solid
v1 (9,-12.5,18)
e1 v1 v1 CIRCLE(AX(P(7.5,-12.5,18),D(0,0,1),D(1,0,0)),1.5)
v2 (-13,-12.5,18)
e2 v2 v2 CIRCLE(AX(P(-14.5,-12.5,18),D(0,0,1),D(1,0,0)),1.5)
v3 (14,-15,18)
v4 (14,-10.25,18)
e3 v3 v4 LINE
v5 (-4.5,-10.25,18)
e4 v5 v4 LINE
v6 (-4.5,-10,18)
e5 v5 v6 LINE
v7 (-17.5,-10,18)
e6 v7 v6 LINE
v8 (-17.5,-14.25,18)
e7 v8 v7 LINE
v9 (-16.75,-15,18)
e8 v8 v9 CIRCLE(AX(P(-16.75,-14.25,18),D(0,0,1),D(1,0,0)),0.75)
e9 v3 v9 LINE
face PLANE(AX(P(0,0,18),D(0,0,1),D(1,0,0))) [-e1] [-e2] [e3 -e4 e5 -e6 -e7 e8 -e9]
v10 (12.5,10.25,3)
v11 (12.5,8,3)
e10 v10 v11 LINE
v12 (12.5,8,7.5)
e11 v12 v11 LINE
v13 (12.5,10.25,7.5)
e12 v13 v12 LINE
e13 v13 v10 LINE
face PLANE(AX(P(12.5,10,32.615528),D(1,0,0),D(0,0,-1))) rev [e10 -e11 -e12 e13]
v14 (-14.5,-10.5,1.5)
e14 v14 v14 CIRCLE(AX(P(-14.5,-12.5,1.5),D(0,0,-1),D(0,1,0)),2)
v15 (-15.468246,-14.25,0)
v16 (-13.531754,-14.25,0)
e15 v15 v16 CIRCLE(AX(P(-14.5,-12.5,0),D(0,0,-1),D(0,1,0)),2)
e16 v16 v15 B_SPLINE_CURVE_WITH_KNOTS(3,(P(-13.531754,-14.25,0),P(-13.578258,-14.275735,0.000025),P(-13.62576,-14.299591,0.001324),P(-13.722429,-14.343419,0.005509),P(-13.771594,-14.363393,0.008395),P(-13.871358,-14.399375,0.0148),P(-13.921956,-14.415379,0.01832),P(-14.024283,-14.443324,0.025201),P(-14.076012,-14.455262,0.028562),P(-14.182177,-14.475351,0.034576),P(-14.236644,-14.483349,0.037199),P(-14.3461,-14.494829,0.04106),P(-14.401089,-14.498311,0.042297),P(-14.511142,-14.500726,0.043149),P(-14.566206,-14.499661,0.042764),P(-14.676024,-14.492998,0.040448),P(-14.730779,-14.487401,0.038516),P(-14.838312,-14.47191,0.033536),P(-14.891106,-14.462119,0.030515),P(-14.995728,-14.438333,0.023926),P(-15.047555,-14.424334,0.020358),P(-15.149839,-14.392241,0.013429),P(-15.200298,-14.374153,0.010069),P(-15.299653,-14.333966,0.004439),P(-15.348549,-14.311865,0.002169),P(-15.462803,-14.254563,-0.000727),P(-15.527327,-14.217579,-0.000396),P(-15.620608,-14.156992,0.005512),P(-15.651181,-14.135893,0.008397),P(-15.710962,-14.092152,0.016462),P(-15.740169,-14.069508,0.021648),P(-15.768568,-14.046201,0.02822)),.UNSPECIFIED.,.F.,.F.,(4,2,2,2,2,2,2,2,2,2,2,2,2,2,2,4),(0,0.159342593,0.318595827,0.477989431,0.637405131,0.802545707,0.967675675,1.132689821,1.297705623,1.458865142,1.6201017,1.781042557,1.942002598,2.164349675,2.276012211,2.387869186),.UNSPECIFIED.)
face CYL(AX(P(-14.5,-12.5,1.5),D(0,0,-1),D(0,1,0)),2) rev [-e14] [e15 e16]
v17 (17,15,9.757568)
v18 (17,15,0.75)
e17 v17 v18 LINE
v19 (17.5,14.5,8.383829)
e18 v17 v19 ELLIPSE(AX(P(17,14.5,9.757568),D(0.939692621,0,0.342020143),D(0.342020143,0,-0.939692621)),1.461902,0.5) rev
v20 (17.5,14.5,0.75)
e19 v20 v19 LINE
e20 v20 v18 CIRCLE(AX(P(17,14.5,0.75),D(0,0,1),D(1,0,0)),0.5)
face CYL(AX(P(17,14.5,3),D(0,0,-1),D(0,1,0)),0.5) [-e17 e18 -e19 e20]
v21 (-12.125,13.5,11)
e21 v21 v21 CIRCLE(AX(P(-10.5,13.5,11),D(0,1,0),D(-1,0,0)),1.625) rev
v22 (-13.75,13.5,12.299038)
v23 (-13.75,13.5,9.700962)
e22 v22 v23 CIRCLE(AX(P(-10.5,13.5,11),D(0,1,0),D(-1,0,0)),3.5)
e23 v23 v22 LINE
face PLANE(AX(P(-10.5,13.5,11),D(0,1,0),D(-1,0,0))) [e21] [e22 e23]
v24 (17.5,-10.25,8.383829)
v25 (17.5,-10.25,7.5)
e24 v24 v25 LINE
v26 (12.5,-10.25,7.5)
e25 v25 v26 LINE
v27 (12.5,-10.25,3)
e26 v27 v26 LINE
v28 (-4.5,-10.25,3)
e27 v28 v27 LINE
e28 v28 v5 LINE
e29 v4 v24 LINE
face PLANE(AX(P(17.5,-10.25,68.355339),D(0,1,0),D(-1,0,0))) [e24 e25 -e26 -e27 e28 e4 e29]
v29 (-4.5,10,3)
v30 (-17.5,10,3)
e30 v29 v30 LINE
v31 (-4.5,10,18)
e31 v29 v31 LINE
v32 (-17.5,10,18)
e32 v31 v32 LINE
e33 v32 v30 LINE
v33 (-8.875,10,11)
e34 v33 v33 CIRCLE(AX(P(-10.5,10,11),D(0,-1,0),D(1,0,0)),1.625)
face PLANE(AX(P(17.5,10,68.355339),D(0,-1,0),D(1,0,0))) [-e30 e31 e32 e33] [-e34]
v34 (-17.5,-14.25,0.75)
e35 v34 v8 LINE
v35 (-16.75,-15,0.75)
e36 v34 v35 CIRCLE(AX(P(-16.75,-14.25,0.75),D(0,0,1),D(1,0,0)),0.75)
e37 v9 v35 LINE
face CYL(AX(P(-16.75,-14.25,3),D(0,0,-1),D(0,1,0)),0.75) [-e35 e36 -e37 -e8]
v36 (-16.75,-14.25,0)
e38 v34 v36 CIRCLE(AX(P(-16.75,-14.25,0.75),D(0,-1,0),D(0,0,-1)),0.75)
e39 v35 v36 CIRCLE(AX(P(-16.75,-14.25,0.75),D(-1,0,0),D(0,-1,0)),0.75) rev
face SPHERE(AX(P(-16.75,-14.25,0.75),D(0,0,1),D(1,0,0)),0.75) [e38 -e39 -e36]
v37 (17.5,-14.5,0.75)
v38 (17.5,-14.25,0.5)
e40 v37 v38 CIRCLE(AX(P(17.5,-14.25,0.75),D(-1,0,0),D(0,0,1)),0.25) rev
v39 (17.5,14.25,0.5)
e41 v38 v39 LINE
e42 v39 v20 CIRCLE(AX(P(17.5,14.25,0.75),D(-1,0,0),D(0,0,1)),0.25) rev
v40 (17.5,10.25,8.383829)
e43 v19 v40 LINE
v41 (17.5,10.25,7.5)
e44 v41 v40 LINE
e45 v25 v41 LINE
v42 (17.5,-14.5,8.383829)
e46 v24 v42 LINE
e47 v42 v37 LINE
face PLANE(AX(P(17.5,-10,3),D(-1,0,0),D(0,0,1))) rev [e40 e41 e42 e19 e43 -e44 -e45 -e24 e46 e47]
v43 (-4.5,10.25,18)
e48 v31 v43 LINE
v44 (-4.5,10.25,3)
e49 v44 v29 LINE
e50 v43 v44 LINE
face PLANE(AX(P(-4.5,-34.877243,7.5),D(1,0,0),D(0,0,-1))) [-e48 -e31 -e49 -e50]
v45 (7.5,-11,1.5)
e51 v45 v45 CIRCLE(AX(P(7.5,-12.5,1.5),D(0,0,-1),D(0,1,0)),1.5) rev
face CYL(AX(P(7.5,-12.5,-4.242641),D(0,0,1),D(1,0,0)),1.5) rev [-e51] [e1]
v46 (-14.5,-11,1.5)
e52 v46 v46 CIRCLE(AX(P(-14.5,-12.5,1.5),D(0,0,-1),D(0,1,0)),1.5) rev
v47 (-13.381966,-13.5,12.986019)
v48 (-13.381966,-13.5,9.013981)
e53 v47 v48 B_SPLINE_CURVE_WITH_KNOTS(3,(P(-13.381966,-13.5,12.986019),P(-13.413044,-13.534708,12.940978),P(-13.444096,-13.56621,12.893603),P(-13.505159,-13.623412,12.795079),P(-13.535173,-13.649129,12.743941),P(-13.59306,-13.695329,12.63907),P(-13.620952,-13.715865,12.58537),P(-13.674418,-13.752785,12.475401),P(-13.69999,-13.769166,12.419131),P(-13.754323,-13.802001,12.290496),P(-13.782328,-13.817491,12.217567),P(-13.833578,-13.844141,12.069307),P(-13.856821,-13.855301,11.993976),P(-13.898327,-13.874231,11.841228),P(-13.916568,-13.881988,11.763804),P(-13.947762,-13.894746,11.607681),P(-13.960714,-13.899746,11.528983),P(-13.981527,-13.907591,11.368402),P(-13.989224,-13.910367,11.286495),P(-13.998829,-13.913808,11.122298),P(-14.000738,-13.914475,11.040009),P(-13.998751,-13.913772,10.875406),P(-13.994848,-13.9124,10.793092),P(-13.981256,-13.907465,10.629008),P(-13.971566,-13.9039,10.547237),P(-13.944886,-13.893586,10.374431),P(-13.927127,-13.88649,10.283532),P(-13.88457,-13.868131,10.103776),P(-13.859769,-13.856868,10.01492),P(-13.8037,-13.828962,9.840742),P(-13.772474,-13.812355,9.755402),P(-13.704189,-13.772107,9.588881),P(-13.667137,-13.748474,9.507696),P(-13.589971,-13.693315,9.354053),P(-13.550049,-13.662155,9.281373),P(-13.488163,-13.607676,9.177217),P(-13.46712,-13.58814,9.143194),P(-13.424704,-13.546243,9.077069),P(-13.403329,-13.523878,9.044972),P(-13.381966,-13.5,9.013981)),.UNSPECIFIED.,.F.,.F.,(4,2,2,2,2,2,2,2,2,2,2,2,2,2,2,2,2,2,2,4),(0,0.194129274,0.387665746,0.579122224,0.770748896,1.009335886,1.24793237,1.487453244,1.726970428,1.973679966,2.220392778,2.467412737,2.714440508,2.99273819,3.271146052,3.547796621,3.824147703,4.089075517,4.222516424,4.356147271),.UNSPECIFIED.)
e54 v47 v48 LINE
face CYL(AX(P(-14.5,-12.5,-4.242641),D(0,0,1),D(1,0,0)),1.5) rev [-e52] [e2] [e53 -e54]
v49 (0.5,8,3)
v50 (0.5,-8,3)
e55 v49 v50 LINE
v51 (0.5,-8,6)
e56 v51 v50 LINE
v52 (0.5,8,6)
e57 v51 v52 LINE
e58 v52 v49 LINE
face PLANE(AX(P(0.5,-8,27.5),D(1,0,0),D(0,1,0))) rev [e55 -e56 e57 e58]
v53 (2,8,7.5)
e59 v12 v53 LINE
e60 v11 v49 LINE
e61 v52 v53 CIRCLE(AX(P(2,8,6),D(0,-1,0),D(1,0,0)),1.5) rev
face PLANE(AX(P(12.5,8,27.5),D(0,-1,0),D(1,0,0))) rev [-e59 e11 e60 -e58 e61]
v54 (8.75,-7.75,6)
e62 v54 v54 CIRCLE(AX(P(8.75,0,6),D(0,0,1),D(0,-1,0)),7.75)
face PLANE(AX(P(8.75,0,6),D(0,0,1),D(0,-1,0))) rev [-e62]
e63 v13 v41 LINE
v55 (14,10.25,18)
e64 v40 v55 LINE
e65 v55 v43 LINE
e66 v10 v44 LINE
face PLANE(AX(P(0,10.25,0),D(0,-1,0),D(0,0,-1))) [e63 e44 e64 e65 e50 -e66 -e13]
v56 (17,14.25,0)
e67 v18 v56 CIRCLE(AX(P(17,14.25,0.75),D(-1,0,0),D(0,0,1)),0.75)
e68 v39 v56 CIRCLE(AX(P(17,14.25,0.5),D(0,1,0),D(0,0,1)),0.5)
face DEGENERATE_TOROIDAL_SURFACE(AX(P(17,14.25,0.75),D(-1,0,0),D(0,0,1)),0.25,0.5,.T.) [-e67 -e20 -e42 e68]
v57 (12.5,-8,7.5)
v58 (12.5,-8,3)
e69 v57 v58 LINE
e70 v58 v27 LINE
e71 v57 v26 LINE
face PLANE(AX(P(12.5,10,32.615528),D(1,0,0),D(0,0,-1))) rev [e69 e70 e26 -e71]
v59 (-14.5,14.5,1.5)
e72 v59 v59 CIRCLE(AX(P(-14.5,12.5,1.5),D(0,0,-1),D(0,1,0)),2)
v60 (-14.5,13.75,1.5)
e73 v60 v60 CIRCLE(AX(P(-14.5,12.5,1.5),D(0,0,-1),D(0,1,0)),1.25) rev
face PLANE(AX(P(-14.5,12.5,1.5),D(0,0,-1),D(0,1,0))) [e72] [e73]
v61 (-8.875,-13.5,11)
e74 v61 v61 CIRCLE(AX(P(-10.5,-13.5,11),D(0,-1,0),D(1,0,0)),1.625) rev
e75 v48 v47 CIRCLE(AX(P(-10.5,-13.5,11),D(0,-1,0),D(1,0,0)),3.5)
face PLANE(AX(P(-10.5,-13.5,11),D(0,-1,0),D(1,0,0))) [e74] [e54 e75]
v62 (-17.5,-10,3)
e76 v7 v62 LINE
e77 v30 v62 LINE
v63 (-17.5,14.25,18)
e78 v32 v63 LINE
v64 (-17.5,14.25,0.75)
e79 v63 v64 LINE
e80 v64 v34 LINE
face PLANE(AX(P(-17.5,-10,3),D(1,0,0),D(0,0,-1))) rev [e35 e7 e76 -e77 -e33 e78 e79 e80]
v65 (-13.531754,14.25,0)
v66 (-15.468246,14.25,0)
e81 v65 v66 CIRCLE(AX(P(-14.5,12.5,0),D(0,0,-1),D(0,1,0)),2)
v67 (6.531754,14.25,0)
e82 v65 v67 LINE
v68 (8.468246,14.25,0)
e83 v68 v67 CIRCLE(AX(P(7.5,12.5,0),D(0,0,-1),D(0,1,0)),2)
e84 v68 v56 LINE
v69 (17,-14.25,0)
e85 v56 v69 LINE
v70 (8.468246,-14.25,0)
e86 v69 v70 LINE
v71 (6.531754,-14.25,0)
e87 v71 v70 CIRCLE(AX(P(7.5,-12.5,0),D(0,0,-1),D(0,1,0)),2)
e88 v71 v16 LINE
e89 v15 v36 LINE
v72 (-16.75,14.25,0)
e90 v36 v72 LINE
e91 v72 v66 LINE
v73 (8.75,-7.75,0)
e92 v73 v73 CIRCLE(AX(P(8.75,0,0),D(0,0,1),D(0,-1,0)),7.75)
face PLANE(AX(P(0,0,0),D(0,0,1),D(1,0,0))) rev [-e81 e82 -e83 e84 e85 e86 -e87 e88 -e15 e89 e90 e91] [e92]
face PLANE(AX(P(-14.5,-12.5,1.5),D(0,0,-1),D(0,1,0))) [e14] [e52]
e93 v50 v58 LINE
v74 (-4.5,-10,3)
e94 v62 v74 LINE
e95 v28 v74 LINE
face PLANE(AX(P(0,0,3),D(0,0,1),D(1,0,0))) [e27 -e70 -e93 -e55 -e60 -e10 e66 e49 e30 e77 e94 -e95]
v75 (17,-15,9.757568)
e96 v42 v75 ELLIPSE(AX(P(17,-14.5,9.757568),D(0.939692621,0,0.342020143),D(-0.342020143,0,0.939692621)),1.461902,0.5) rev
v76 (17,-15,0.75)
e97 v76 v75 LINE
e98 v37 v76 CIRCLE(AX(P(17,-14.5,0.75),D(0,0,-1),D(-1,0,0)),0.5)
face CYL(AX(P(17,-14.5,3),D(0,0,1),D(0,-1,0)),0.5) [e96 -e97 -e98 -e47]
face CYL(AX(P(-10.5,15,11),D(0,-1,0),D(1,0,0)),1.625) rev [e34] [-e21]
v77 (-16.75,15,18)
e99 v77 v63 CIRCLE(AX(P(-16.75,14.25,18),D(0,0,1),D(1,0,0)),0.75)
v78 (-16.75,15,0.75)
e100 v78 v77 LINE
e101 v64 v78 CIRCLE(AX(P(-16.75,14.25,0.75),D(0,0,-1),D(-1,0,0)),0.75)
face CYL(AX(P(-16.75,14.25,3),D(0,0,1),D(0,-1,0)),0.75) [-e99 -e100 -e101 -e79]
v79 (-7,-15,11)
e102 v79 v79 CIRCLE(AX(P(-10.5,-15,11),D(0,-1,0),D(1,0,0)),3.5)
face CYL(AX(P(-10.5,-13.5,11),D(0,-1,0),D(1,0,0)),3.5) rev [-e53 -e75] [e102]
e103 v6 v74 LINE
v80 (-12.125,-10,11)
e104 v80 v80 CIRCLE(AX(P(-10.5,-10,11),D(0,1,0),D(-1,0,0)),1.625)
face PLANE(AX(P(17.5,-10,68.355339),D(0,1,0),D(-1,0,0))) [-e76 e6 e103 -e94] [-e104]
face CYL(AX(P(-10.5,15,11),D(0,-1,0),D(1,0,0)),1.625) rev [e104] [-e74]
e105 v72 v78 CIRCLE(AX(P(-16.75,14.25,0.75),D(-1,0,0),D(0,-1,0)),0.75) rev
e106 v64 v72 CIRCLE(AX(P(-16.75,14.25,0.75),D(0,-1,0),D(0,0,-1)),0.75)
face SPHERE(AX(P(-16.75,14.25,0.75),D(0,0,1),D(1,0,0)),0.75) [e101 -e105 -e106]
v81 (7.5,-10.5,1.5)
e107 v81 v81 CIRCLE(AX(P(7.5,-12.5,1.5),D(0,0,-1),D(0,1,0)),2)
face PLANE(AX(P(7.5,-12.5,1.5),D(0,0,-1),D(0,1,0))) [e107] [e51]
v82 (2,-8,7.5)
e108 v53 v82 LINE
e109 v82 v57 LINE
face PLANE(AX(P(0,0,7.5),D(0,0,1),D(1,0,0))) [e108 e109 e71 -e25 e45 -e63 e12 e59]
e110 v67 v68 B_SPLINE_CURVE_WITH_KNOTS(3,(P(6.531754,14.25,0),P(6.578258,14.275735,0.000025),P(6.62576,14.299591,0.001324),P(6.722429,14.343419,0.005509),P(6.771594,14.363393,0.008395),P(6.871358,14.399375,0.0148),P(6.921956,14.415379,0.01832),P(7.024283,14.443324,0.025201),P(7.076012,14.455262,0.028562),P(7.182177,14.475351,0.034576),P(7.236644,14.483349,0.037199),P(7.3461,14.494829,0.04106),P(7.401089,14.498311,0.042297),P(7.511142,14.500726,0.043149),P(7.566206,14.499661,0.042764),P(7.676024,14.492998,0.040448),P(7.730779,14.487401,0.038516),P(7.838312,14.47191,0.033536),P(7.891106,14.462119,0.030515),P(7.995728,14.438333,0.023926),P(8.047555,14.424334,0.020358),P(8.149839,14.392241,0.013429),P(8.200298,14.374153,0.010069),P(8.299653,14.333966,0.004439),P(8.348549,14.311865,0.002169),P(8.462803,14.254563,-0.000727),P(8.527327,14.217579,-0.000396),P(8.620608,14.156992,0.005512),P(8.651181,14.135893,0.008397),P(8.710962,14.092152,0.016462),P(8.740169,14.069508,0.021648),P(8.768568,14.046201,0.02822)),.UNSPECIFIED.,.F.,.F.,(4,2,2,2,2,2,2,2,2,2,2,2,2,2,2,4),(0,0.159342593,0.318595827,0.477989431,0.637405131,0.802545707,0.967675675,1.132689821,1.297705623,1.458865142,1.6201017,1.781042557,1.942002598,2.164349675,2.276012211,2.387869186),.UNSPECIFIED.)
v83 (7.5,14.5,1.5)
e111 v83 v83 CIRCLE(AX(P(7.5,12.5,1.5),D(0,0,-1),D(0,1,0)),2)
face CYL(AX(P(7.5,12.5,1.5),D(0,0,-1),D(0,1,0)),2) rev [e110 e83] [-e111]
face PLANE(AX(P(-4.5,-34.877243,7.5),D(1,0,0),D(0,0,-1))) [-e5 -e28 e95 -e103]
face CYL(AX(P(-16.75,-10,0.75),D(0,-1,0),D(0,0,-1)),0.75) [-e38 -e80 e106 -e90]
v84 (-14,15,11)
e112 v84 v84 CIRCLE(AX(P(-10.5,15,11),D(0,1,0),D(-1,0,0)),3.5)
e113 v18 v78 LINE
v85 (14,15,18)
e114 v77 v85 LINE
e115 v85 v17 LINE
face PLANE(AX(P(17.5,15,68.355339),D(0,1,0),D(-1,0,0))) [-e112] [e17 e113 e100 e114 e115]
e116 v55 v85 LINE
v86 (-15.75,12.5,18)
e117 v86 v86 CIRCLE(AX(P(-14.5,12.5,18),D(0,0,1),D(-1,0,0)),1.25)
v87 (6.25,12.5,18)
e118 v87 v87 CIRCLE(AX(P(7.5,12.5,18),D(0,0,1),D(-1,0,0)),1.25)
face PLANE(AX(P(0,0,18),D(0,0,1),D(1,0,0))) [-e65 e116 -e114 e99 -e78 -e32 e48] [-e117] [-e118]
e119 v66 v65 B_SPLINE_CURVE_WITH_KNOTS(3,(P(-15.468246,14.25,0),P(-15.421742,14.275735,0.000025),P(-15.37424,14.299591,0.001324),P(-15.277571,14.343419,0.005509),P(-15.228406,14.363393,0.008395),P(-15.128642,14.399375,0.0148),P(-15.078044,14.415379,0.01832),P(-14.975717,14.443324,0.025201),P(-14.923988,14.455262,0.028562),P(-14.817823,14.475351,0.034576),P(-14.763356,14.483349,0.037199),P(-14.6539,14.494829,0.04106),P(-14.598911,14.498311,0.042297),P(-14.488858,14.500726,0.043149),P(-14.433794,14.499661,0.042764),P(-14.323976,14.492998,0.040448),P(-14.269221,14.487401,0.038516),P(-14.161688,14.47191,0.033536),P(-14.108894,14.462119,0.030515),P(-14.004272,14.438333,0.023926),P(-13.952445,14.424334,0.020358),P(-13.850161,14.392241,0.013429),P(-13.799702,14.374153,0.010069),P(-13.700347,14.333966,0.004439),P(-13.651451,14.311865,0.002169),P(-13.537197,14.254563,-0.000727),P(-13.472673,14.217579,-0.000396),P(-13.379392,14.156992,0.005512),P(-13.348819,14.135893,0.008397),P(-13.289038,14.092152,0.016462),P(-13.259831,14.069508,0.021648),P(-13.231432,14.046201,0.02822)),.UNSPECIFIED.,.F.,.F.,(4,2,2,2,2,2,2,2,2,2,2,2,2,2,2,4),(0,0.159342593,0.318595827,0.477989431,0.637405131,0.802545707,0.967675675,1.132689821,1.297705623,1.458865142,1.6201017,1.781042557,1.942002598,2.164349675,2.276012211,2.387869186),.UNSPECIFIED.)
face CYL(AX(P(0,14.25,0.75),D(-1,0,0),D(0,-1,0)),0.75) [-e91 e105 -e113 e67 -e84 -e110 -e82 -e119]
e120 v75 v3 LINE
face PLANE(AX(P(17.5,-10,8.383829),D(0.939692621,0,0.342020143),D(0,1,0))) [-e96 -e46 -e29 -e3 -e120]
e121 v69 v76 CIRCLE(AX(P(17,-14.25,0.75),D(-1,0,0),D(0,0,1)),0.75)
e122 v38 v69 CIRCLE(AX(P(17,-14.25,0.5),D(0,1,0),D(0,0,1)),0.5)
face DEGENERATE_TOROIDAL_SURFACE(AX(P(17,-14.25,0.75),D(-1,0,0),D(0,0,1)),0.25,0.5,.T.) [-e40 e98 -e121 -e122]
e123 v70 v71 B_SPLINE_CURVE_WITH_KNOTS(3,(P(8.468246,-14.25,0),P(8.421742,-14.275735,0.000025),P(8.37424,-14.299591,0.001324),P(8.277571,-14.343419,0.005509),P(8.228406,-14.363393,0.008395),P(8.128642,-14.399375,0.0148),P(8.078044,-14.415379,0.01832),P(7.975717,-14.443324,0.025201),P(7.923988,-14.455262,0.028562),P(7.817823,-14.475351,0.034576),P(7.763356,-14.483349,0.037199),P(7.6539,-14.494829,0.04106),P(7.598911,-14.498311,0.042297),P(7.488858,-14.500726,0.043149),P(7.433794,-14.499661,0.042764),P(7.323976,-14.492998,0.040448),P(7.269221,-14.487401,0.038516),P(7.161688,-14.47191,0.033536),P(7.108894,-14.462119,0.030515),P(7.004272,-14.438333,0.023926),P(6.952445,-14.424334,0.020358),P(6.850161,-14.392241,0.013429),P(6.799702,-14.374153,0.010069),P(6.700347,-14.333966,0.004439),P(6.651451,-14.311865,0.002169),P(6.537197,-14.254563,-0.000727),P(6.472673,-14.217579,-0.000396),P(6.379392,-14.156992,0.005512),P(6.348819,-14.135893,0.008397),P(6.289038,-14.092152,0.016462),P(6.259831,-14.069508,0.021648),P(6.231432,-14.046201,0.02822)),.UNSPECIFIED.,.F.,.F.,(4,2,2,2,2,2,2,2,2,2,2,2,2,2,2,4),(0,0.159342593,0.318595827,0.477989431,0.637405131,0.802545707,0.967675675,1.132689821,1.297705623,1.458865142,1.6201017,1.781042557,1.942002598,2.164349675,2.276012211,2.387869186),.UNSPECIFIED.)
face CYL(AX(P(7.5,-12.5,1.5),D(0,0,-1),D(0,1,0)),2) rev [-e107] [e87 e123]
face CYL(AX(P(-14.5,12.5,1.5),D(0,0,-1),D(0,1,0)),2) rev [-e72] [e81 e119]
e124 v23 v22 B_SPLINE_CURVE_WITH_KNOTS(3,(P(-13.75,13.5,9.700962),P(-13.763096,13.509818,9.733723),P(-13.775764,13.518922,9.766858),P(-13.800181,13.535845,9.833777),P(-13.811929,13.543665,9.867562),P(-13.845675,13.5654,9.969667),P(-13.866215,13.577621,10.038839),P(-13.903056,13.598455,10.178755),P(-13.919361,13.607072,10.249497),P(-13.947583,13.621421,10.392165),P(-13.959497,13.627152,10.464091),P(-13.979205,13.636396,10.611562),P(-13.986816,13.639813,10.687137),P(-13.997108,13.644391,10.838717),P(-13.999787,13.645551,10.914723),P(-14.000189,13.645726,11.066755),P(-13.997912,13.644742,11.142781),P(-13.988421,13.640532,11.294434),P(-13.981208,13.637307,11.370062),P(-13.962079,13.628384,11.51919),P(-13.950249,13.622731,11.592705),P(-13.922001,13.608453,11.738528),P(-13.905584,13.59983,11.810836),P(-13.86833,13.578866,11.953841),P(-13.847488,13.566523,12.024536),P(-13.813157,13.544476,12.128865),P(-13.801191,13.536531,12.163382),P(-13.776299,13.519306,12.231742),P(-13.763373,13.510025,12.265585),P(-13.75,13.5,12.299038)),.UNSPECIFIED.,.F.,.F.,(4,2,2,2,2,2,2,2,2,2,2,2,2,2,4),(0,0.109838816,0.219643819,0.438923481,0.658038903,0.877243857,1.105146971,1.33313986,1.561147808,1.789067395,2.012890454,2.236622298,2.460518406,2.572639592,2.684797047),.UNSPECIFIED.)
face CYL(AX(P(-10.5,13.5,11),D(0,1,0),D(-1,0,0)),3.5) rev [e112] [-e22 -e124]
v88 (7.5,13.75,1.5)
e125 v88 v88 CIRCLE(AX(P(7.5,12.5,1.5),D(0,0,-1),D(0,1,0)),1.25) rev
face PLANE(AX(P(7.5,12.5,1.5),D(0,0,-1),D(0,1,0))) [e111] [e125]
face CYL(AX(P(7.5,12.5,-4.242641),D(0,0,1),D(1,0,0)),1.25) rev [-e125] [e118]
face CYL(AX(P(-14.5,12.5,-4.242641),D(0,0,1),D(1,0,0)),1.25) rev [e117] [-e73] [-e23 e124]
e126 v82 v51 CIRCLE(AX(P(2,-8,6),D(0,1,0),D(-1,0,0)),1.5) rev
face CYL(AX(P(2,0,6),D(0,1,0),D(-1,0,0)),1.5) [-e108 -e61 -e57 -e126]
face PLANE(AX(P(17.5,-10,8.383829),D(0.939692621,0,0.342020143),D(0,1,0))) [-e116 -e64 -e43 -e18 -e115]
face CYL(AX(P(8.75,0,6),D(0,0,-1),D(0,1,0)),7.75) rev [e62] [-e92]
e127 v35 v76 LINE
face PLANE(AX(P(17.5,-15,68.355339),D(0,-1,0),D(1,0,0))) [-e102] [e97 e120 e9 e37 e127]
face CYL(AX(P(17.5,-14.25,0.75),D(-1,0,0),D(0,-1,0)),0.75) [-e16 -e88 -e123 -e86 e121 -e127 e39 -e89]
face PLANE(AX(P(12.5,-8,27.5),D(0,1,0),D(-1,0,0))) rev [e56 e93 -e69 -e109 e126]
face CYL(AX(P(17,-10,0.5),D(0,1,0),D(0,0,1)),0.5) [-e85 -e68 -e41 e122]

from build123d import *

# Parameters (mm, degrees)
SKETCH1_W              = 35
SKETCH1_H              = 20
BASE_PLATE_DEPTH       = 3
SKETCH2_W              = 35
SKETCH2_H              = 5
SIDE_WALLS_DEPTH       = 18
SKETCH4_R              = 1.5
SKETCH4_R_2            = 1.25
M2_SCREWS_DEPTH        = 18
SKETCH6_W              = 5
SKETCH6_H              = 20
RETURN_STOPPER_DEPTH   = 4.5
SKETCH9_W              = 12
SKETCH9_H              = 16
BOSS_EXTRUDE1_DEPTH    = 4.5
SKETCH7_R              = 7.75
MAGNET_POCKET_DEPTH    = 6
SKETCH8_R              = 2
M2_SCREW_HEAD_DEPTH    = 1.5
M3_ACHSLE_DEPTH        = 36.429507476
M3_ACHSLE_DEPTH_BACK   = 36.429507476
SKETCH5_R              = 1.625
SKETCH14_R             = 3.5
CUT_EXTRUDE1_DEPTH     = 1.5
CUT_EXTRUDE2_START     = -1.5
SKETCH15_R             = 3.5
CUT_EXTRUDE2_DEPTH     = 1.5
FILLET1_R              = 1.5
LEAVER_START           = -0.25
SKETCH11_W             = 22
SKETCH11_H             = 10.5
LEAVER_SPACE_DEPTH     = 20.5
SKETCH12_W             = 17
SKETCH12_H             = 4.5
MORE_SPACE_LEFT_DEPTH  = 0.25
SKETCH13_W             = 17
SKETCH13_H             = 4.5
MORE_SPACE_RIGHT_DEPTH = 0.25
FILLET2_R              = 0.75
FILLET3_R              = 0.75
FILLET4_R              = 0.75
FILLET5_R              = 0.5
CHAMFER1_SIZE          = 3.5
CHAMFER1_SIZE_2        = 9.616170968


with BuildPart() as part:
    # Sketch1 → Base Plate (new body)
    with BuildSketch(Plane.XY):
        Rectangle(SKETCH1_W, SKETCH1_H)
    extrude(amount=BASE_PLATE_DEPTH)

    # Sketch2 → Side Walls (add)
    with BuildSketch(Plane(origin=(0, 0, 0), x_dir=(1, 0, 0), z_dir=(0, 0, -1))):
        with Locations((0, -12.5)):
            Rectangle(SKETCH2_W, SKETCH2_H)
        with Locations((0, 12.5)):
            Rectangle(SKETCH2_W, SKETCH2_H)
    extrude(amount=-SIDE_WALLS_DEPTH)

    # Sketch4 → M2 Screws (cut)
    with BuildSketch(Plane.XY.offset(18)):
        with Locations((-14.5, -12.5)):
            Circle(SKETCH4_R)
        with Locations((7.5, -12.5)):
            Circle(SKETCH4_R)
        with Locations((7.5, 12.5)):
            Circle(SKETCH4_R_2)
        with Locations((-14.5, 12.5)):
            Circle(SKETCH4_R_2)
    extrude(amount=-M2_SCREWS_DEPTH, mode=Mode.SUBTRACT)

    # Sketch6 → Return Stopper (add)
    with BuildSketch(Plane.XY.offset(3)):
        with Locations((15, 0)):
            Rectangle(SKETCH6_W, SKETCH6_H)
    extrude(amount=RETURN_STOPPER_DEPTH)

    # Sketch9 → Boss-Extrude1 (add)
    with BuildSketch(Plane.XY.offset(3)):
        with Locations((6.5, 0)):
            Rectangle(SKETCH9_W, SKETCH9_H)
    extrude(amount=BOSS_EXTRUDE1_DEPTH)

    # Sketch7 → Magnet Pocket (cut)
    with BuildSketch(Plane(origin=(0, 0, 0), x_dir=(-1, 0, 0), z_dir=(0, 0, 1))):
        with Locations(Location((-8.75, 0, 0), (0, 0, 90))):
            Circle(SKETCH7_R)
    extrude(amount=MAGNET_POCKET_DEPTH, mode=Mode.SUBTRACT)

    # Sketch8 → M2 Screw Head (cut)
    with BuildSketch(Plane(origin=(0, 0, 0), x_dir=(1, 0, 0), z_dir=(0, 0, -1))):
        with Locations(Location((7.5, -12.5, 0), (0, 0, 270))):
            Circle(SKETCH8_R)
        with Locations(Location((-14.5, -12.5, 0), (0, 0, 270))):
            Circle(SKETCH8_R)
        with Locations(Location((7.5, 12.5, 0), (0, 0, 270))):
            Circle(SKETCH8_R)
        with Locations(Location((-14.5, 12.5, 0), (0, 0, 270))):
            Circle(SKETCH8_R)
    extrude(amount=-M2_SCREW_HEAD_DEPTH, mode=Mode.SUBTRACT)

    # Sketch5 → M3 Achsle (cut, two sides: drawn at the far end of the back side and taken through both)
    with BuildSketch(Plane.XZ.offset(-10).offset(-M3_ACHSLE_DEPTH_BACK)):
        with Locations((-10.5, 11)):
            Circle(SKETCH5_R)
    extrude(amount=M3_ACHSLE_DEPTH + M3_ACHSLE_DEPTH_BACK, mode=Mode.SUBTRACT)

    # Sketch14 → Cut-Extrude1 (cut)
    with BuildSketch(Plane(origin=(0, 15, 0), x_dir=(-1, 0, 0), z_dir=(0, 1, 0))):
        with Locations((10.5, 11)):
            Circle(SKETCH14_R)
    extrude(amount=-CUT_EXTRUDE1_DEPTH, mode=Mode.SUBTRACT)

    # Sketch15 → Cut-Extrude2 (cut)
    with BuildSketch(Plane.XZ.offset(15).offset(CUT_EXTRUDE2_START)):
        with Locations(Location((-10.5, 11, 0), (0, 0, 180))):
            Circle(SKETCH15_R)
    extrude(amount=CUT_EXTRUDE2_DEPTH, mode=Mode.SUBTRACT)

    # Fillet1
    fillet1_edges = [part.edges().sort_by_distance(p)[0] for p in [
        (0.5, 0, 7.5),
    ]]
    fillet(fillet1_edges, radius=FILLET1_R)

    # Sketch11 → Leaver Space (cut)
    with BuildSketch(Plane.XZ.offset(-10).offset(LEAVER_START)):
        with Locations((6.5, 12.75)):
            Rectangle(SKETCH11_W, SKETCH11_H)
    extrude(amount=LEAVER_SPACE_DEPTH, mode=Mode.SUBTRACT)

    # Sketch12 → More Space left (cut)
    with BuildSketch(Plane.XZ.offset(-10)):
        with Locations((4, 5.25)):
            Rectangle(SKETCH12_W, SKETCH12_H)
    extrude(amount=-MORE_SPACE_LEFT_DEPTH, mode=Mode.SUBTRACT)

    # Sketch13 → More Space right (cut)
    with BuildSketch(Plane(origin=(0, -10, 0), x_dir=(-1, 0, 0), z_dir=(0, 1, 0))):
        with Locations((-4, 5.25)):
            Rectangle(SKETCH13_W, SKETCH13_H)
    extrude(amount=-MORE_SPACE_RIGHT_DEPTH, mode=Mode.SUBTRACT)

    # Fillet2
    # the kernel refuses this fillet: 0.75 mm, written as the material it takes off along each edge
    with BuildSketch(Plane(origin=(19.375, 15, 0), x_dir=(0, -1, 0), z_dir=(-1, 0, 0))) as fillet2_piece_1:
        with BuildLine():
            CenterArc((FILLET2_R, FILLET2_R), FILLET2_R, 180, 90)
            Line((0, FILLET2_R), (0, 0))
            Line((0, 0), (FILLET2_R, 0))
        make_face()
    extrude(amount=38.75, mode=Mode.SUBTRACT)

    # Fillet3
    # the kernel refuses this fillet: 0.75 mm, written as the material it takes off along each edge
    with BuildSketch(Plane(origin=(-19.375, -15, 0), x_dir=(0, 1, 0), z_dir=(1, 0, 0))) as fillet3_piece_1:
        with BuildLine():
            CenterArc((FILLET3_R, FILLET3_R), FILLET3_R, 180, 90)
            Line((0, FILLET3_R), (0, 0))
            Line((0, 0), (FILLET3_R, 0))
        make_face()
    extrude(amount=38.75, mode=Mode.SUBTRACT)

    # Fillet4
    fillet4_edges = [part.edges().sort_by_distance(p)[0] for p in [
        (-17.5, -15, 9.375),
        (-17.5, 0, 0),
        (-17.5, 14.780330086, 0.219669914),
        (-17.5, -14.780330086, 0.219669914),
        (-17.5, 15, 9.375),
    ]]
    fillet(fillet4_edges, radius=FILLET4_R)

    # Fillet5
    fillet5_edges = [part.edges().sort_by_distance(p)[0] for p in [
        (17.5, -15, 9.375),
        (17.5, 14.780330086, 0.219669914),
        (17.5, 0, 0),
        (17.5, -14.780330086, 0.219669914),
        (17.5, 15, 9.375),
    ]]
    fillet(fillet5_edges, radius=FILLET5_R)

    # Chamfer1
    # the kernel refuses this chamfer: 9.616170968, 3.5 mm, written as the material it takes off along each edge
    with BuildSketch(Plane(origin=(17.5, -14.696220073, 18), x_dir=(-0.9950833631817486, 0, 0.09904090225205049), z_dir=(0, 1, 0))) as chamfer1_piece_1:
        Polygon((CHAMFER1_SIZE * 0.995083363182, -CHAMFER1_SIZE * 0.0990409022521), (-CHAMFER1_SIZE_2 * 0.099040902253, -CHAMFER1_SIZE_2 * 0.995083363191), (0, 0), align=None)
    extrude(amount=54.142440145, mode=Mode.SUBTRACT)
    with BuildSketch(Plane(origin=(17.5, -39.446220073, 18), x_dir=(0.013184058198645607, 0, -0.9999130865277316), z_dir=(0, 1, 0))) as chamfer1_piece_2:
        Polygon((CHAMFER1_SIZE_2 * 0.999913086537, CHAMFER1_SIZE_2 * 0.0131840581988), (-CHAMFER1_SIZE * 0.0131840581986, CHAMFER1_SIZE * 0.999913086528), (0, 0), align=None)
    extrude(amount=54.142440145, mode=Mode.SUBTRACT)


solid = part.part
